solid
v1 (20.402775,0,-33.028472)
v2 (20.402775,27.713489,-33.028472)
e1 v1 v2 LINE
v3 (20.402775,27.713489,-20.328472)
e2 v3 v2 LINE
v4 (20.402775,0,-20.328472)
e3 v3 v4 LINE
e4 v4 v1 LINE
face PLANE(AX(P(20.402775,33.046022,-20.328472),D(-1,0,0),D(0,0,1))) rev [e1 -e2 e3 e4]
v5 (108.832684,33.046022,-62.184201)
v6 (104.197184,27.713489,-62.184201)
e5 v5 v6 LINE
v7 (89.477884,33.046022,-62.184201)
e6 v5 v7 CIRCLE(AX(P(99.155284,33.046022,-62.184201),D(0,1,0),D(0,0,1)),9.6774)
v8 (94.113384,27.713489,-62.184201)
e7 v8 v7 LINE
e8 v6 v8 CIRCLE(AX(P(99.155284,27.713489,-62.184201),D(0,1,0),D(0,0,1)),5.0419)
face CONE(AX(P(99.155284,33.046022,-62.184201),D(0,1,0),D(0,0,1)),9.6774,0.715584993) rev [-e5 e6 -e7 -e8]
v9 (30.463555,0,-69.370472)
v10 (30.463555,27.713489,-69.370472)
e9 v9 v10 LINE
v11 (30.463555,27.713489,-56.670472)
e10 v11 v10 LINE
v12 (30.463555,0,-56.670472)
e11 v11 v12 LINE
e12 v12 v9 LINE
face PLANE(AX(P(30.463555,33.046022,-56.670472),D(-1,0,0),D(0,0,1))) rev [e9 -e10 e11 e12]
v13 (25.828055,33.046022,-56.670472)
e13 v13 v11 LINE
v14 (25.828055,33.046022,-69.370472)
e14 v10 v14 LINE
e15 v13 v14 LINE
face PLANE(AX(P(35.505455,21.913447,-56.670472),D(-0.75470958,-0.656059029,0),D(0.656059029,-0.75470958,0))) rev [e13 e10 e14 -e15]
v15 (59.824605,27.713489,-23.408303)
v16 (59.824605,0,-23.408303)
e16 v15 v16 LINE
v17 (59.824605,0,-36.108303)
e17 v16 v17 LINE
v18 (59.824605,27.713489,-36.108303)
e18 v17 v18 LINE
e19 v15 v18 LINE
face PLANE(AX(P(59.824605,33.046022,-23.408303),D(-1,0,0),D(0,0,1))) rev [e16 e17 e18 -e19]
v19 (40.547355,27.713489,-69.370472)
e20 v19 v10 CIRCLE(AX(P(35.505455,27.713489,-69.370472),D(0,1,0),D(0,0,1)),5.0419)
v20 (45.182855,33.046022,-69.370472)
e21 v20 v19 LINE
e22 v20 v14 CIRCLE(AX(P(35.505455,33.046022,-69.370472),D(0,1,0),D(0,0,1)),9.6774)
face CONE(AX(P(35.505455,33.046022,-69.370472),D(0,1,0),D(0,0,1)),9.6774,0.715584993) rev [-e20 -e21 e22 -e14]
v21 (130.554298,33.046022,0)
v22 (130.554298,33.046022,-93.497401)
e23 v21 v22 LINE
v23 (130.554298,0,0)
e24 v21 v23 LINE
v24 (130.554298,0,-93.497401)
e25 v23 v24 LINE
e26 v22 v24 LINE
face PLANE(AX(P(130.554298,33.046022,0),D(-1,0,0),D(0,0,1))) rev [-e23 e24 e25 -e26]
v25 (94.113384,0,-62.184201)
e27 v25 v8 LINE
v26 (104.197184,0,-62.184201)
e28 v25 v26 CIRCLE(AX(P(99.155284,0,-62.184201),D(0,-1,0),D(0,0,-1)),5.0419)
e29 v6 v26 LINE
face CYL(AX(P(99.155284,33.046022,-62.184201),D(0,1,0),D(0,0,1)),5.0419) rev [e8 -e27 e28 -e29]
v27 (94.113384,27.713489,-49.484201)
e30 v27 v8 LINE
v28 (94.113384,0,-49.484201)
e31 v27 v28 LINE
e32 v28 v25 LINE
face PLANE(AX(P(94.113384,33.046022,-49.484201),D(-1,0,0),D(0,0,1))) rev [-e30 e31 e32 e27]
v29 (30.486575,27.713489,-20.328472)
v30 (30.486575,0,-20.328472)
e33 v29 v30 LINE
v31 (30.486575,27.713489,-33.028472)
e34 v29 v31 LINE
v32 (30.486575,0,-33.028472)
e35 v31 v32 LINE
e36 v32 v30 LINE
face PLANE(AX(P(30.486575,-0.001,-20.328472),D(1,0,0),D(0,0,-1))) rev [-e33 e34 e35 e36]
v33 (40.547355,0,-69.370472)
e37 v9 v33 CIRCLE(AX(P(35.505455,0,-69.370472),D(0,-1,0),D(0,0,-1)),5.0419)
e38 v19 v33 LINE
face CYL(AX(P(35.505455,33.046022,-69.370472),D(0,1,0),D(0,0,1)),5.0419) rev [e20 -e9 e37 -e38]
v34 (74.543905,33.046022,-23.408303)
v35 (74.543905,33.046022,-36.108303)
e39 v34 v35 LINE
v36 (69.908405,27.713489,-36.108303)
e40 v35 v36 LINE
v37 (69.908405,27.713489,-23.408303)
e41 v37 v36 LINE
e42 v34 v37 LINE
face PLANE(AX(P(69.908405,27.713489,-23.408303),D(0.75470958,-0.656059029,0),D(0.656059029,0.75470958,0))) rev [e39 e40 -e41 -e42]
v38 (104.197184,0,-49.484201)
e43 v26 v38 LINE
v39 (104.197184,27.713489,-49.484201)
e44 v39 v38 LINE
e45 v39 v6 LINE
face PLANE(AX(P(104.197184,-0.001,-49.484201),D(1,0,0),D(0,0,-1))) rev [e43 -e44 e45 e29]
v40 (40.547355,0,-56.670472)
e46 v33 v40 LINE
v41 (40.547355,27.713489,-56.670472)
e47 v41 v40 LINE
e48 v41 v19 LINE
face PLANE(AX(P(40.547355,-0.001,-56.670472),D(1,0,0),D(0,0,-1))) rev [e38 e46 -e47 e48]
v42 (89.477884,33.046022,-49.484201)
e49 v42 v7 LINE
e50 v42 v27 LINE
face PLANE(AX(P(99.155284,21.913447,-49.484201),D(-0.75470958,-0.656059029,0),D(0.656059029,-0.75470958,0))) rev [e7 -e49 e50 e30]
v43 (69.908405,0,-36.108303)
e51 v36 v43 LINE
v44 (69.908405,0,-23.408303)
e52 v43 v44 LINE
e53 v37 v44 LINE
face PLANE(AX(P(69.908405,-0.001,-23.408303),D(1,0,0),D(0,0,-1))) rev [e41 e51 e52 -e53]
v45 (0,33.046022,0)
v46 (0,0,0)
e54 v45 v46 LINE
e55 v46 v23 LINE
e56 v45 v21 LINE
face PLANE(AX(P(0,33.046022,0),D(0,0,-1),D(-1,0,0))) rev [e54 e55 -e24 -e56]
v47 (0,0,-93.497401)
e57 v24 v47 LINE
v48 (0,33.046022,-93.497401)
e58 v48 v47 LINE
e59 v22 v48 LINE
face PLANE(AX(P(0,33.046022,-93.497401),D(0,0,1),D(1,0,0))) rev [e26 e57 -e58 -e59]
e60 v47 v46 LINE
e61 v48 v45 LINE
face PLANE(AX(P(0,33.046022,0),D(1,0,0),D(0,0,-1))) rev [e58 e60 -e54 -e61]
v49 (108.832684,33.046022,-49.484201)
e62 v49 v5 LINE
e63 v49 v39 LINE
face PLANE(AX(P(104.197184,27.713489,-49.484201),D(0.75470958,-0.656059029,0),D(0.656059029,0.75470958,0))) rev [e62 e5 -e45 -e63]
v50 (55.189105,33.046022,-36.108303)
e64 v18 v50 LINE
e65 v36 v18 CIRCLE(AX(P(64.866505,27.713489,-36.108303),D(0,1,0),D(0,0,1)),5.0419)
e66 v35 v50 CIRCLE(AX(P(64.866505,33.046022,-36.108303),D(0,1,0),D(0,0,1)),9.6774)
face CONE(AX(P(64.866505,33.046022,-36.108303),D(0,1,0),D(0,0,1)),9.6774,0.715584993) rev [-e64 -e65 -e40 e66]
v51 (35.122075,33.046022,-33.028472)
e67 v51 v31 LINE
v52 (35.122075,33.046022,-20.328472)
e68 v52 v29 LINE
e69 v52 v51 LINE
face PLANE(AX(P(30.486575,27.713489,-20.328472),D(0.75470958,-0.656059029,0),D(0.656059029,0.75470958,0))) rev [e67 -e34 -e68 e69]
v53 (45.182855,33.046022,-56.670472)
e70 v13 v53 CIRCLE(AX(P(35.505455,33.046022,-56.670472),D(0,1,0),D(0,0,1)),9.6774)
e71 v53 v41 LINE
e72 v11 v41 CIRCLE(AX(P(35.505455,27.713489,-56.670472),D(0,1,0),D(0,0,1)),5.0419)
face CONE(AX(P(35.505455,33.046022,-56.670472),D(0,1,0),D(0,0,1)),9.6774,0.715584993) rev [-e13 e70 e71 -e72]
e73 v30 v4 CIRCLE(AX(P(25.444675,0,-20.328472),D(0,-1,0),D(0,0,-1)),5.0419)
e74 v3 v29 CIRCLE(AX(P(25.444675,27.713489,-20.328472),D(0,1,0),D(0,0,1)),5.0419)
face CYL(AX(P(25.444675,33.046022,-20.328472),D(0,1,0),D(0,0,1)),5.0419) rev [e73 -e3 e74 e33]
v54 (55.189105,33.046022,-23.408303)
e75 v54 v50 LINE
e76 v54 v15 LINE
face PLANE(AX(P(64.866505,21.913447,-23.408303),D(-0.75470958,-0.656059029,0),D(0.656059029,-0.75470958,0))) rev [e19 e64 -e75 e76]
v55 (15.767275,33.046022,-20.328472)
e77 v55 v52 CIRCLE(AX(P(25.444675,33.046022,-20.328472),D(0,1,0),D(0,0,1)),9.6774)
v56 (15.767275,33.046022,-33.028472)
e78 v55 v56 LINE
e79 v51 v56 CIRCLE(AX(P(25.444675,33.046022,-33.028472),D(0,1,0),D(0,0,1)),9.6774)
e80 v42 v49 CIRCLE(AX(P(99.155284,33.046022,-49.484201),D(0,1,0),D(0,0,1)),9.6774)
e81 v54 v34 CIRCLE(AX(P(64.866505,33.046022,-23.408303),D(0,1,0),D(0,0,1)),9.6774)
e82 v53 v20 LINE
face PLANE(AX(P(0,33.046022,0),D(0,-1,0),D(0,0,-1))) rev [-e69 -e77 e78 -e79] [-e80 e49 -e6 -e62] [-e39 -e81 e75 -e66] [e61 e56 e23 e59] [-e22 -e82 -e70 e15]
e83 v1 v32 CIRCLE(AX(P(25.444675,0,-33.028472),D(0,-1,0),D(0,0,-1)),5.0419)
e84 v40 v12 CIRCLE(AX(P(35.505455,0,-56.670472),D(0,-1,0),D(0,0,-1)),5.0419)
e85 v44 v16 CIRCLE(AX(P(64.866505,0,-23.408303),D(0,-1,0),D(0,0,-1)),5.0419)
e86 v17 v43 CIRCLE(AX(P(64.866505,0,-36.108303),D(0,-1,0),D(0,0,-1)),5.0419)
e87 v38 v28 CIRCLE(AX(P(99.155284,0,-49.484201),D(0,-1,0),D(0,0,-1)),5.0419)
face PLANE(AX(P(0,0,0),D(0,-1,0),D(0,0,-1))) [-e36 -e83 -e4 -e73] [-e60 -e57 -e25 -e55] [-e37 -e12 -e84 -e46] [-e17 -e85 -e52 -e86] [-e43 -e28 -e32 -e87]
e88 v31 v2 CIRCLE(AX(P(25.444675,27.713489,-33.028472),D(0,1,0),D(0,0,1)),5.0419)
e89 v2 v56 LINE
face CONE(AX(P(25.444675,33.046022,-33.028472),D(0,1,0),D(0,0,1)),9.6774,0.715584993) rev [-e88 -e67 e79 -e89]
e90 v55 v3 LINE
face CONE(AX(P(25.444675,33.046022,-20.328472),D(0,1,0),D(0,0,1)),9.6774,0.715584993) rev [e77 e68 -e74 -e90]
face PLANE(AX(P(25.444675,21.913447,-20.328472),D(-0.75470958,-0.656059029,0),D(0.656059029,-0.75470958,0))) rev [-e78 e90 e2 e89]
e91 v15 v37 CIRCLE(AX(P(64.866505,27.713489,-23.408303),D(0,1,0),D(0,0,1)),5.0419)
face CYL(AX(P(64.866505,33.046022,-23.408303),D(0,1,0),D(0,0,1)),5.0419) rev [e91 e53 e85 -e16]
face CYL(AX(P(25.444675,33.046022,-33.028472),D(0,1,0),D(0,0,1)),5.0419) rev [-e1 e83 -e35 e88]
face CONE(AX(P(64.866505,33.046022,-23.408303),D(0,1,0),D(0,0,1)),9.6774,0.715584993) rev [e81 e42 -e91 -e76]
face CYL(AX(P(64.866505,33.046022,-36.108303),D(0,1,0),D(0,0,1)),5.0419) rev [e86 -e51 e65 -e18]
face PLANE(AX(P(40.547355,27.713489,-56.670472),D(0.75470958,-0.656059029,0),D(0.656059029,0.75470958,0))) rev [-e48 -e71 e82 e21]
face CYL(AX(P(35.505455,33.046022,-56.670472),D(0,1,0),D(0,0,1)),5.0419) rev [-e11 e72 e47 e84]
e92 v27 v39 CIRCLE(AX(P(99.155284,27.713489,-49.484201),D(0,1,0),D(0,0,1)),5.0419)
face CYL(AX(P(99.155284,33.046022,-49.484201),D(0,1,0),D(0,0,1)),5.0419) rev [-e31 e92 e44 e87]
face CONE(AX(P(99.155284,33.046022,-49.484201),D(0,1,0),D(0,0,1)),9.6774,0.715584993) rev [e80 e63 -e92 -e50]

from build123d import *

# Parameters (mm, degrees)
SKETCH1_W                                      = 130.554298298
SKETCH1_H                                      = 93.497401401
BOSS_EXTRUDE1_DEPTH                            = 33.046022073
CSK_SLOT_FOR_3_8_FLAT_HEAD_MACHINE_SCREW_DEPTH = 33.046022073


with BuildPart() as part:
    # Sketch1 → Boss-Extrude1 (new body)
    with BuildSketch(Plane(origin=(0, 0, 0), x_dir=(1, 0, 0), z_dir=(0, 1, 0))):
        with Locations((65.277149149, 46.748700701)):
            Rectangle(SKETCH1_W, SKETCH1_H)
    extrude(amount=BOSS_EXTRUDE1_DEPTH)

    # CSK SLOT for 3/8 Flat Head Machine Screw1: read off the stored shape, not the designer's step
    # CSK SLOT for 3_8 Flat Head Machine S 2 → CSK SLOT for 3/8 Flat Head Machine Screw1 (cut)
    with BuildSketch(Plane(origin=(0, 0, 0), x_dir=(1, 0, 0), z_dir=(0, 1, 0))):
        with BuildLine():
            Line((30.486575013, 20.328472109), (30.486575013, 33.028472109))
            ThreePointArc((30.486575013, 33.028472109), (25.444675013, 38.070372109), (20.402775013, 33.028472109))
            Line((20.402775013, 33.028472109), (20.402775013, 20.328472109))
            ThreePointArc((20.402775013, 20.328472109), (25.444675013, 15.286572109), (30.486575013, 20.328472109))
        make_face()
        with BuildLine():
            Line((69.908405086, 23.408302584), (69.908405086, 36.108302584))
            ThreePointArc((69.908405086, 36.108302584), (64.866505086, 41.150202584), (59.824605086, 36.108302584))
            Line((59.824605086, 36.108302584), (59.824605086, 23.408302584))
            ThreePointArc((59.824605086, 23.408302584), (64.866505086, 18.366402584), (69.908405086, 23.408302584))
        make_face()
        with BuildLine():
            Line((104.197184368, 49.4842006), (104.197184368, 62.1842006))
            ThreePointArc((104.197184368, 62.1842006), (99.155284368, 67.2261006), (94.113384368, 62.1842006))
            Line((94.113384368, 62.1842006), (94.113384368, 49.4842006))
            ThreePointArc((94.113384368, 49.4842006), (99.155284368, 44.4423006), (104.197184368, 49.4842006))
        make_face()
        with BuildLine():
            Line((40.547354563, 56.670471707), (40.547354563, 69.370471707))
            ThreePointArc((40.547354563, 69.370471707), (35.505454563, 74.412371707), (30.463554563, 69.370471707))
            Line((30.463554563, 69.370471707), (30.463554563, 56.670471707))
            ThreePointArc((30.463554563, 56.670471707), (35.505454563, 51.628571707), (40.547354563, 56.670471707))
        make_face()
    extrude(amount=CSK_SLOT_FOR_3_8_FLAT_HEAD_MACHINE_SCREW_DEPTH, mode=Mode.SUBTRACT)

    # CSK SLOT for 3_8 Flat Head Machine S 3: loft between two sections, ruled curve by curve
    csk_slot_for_3_8_flat_head_machine_s_3_from = [
        Edge.make_three_point_arc((30.486575013, 27.713489321, -33.028472109), (29.009836693, 27.713489321, -36.593633789), (25.444675013, 27.713489321, -38.070372109)),
        Edge.make_three_point_arc((25.444675013, 27.713489321, -38.070372109), (21.879513333, 27.713489321, -36.593633789), (20.402775013, 27.713489321, -33.028472109)),
        Edge.make_three_point_arc((20.402775013, 27.713489321, -20.328472109), (21.879513333, 27.713489321, -16.763310429), (25.444675013, 27.713489321, -15.286572109)),
        Edge.make_three_point_arc((25.444675013, 27.713489321, -15.286572109), (29.009836693, 27.713489321, -16.763310429), (30.486575013, 27.713489321, -20.328472109)),
        Edge.make_line((20.402775013, 27.713489321, -33.028472109), (20.402775013, 27.713489321, -20.328472109)),
        Edge.make_line((30.486575013, 27.713489321, -33.028472109), (30.486575013, 27.713489321, -20.328472109)),
    ]
    csk_slot_for_3_8_flat_head_machine_s_3_to = [
        Edge.make_three_point_arc((35.122075013, 33.046022073, -33.028472109), (32.287630178, 33.046022073, -39.871427273), (25.444675013, 33.046022073, -42.705872109)),
        Edge.make_three_point_arc((25.444675013, 33.046022073, -42.705872109), (18.601719849, 33.046022073, -39.871427273), (15.767275013, 33.046022073, -33.028472109)),
        Edge.make_three_point_arc((15.767275013, 33.046022073, -20.328472109), (18.601719849, 33.046022073, -13.485516945), (25.444675013, 33.046022073, -10.651072109)),
        Edge.make_three_point_arc((25.444675013, 33.046022073, -10.651072109), (32.287630178, 33.046022073, -13.485516945), (35.122075013, 33.046022073, -20.328472109)),
        Edge.make_line((15.767275013, 33.046022073, -33.028472109), (15.767275013, 33.046022073, -20.328472109)),
        Edge.make_line((35.122075013, 33.046022073, -33.028472109), (35.122075013, 33.046022073, -20.328472109)),
    ]
    csk_slot_for_3_8_flat_head_machine_s_3 = Solid(Shell([*[Face.make_surface_from_curves(csk_slot_for_3_8_flat_head_machine_s_3_from[k], csk_slot_for_3_8_flat_head_machine_s_3_to[k]) for k in range(6)], Face(Wire(csk_slot_for_3_8_flat_head_machine_s_3_from)), Face(Wire(csk_slot_for_3_8_flat_head_machine_s_3_to))]))
    add(csk_slot_for_3_8_flat_head_machine_s_3, mode=Mode.SUBTRACT)

    # CSK SLOT for 3_8 Flat Head Machine S 4: loft between two sections, ruled curve by curve
    csk_slot_for_3_8_flat_head_machine_s_4_from = [
        Edge.make_three_point_arc((69.908405086, 27.713489321, -36.108302584), (68.431666766, 27.713489321, -39.673464264), (64.866505086, 27.713489321, -41.150202584)),
        Edge.make_three_point_arc((64.866505086, 27.713489321, -41.150202584), (61.301343406, 27.713489321, -39.673464264), (59.824605086, 27.713489321, -36.108302584)),
        Edge.make_three_point_arc((59.824605086, 27.713489321, -23.408302584), (61.301343406, 27.713489321, -19.843140903), (64.866505086, 27.713489321, -18.366402584)),
        Edge.make_three_point_arc((64.866505086, 27.713489321, -18.366402584), (68.431666766, 27.713489321, -19.843140903), (69.908405086, 27.713489321, -23.408302584)),
        Edge.make_line((59.824605086, 27.713489321, -36.108302584), (59.824605086, 27.713489321, -23.408302584)),
        Edge.make_line((69.908405086, 27.713489321, -36.108302584), (69.908405086, 27.713489321, -23.408302584)),
    ]
    csk_slot_for_3_8_flat_head_machine_s_4_to = [
        Edge.make_three_point_arc((74.543905086, 33.046022073, -36.108302584), (71.70946025, 33.046022073, -42.951257748), (64.866505086, 33.046022073, -45.785702584)),
        Edge.make_three_point_arc((64.866505086, 33.046022073, -45.785702584), (58.023549922, 33.046022073, -42.951257748), (55.189105086, 33.046022073, -36.108302584)),
        Edge.make_three_point_arc((55.189105086, 33.046022073, -23.408302584), (58.023549922, 33.046022073, -16.565347419), (64.866505086, 33.046022073, -13.730902584)),
        Edge.make_three_point_arc((64.866505086, 33.046022073, -13.730902584), (71.70946025, 33.046022073, -16.565347419), (74.543905086, 33.046022073, -23.408302584)),
        Edge.make_line((55.189105086, 33.046022073, -36.108302584), (55.189105086, 33.046022073, -23.408302584)),
        Edge.make_line((74.543905086, 33.046022073, -36.108302584), (74.543905086, 33.046022073, -23.408302584)),
    ]
    csk_slot_for_3_8_flat_head_machine_s_4 = Solid(Shell([*[Face.make_surface_from_curves(csk_slot_for_3_8_flat_head_machine_s_4_from[k], csk_slot_for_3_8_flat_head_machine_s_4_to[k]) for k in range(6)], Face(Wire(csk_slot_for_3_8_flat_head_machine_s_4_from)), Face(Wire(csk_slot_for_3_8_flat_head_machine_s_4_to))]))
    add(csk_slot_for_3_8_flat_head_machine_s_4, mode=Mode.SUBTRACT)

    # CSK SLOT for 3_8 Flat Head Machine S 5: loft between two sections, ruled curve by curve
    csk_slot_for_3_8_flat_head_machine_s_5_from = [
        Edge.make_three_point_arc((104.197184368, 27.713489321, -62.1842006), (102.720446048, 27.713489321, -65.74936228), (99.155284368, 27.713489321, -67.2261006)),
        Edge.make_three_point_arc((99.155284368, 27.713489321, -67.2261006), (95.590122688, 27.713489321, -65.74936228), (94.113384368, 27.713489321, -62.1842006)),
        Edge.make_three_point_arc((94.113384368, 27.713489321, -49.4842006), (95.590122688, 27.713489321, -45.91903892), (99.155284368, 27.713489321, -44.4423006)),
        Edge.make_three_point_arc((99.155284368, 27.713489321, -44.4423006), (102.720446048, 27.713489321, -45.91903892), (104.197184368, 27.713489321, -49.4842006)),
        Edge.make_line((94.113384368, 27.713489321, -62.1842006), (94.113384368, 27.713489321, -49.4842006)),
        Edge.make_line((104.197184368, 27.713489321, -62.1842006), (104.197184368, 27.713489321, -49.4842006)),
    ]
    csk_slot_for_3_8_flat_head_machine_s_5_to = [
        Edge.make_three_point_arc((108.832684368, 33.046022073, -62.1842006), (105.998239532, 33.046022073, -69.027155764), (99.155284368, 33.046022073, -71.8616006)),
        Edge.make_three_point_arc((99.155284368, 33.046022073, -71.8616006), (92.312329203, 33.046022073, -69.027155764), (89.477884368, 33.046022073, -62.1842006)),
        Edge.make_three_point_arc((89.477884368, 33.046022073, -49.4842006), (92.312329203, 33.046022073, -42.641245436), (99.155284368, 33.046022073, -39.8068006)),
        Edge.make_three_point_arc((99.155284368, 33.046022073, -39.8068006), (105.998239532, 33.046022073, -42.641245436), (108.832684368, 33.046022073, -49.4842006)),
        Edge.make_line((89.477884368, 33.046022073, -62.1842006), (89.477884368, 33.046022073, -49.4842006)),
        Edge.make_line((108.832684368, 33.046022073, -62.1842006), (108.832684368, 33.046022073, -49.4842006)),
    ]
    csk_slot_for_3_8_flat_head_machine_s_5 = Solid(Shell([*[Face.make_surface_from_curves(csk_slot_for_3_8_flat_head_machine_s_5_from[k], csk_slot_for_3_8_flat_head_machine_s_5_to[k]) for k in range(6)], Face(Wire(csk_slot_for_3_8_flat_head_machine_s_5_from)), Face(Wire(csk_slot_for_3_8_flat_head_machine_s_5_to))]))
    add(csk_slot_for_3_8_flat_head_machine_s_5, mode=Mode.SUBTRACT)

    # CSK SLOT for 3_8 Flat Head Machine S 6: loft between two sections, ruled curve by curve
    csk_slot_for_3_8_flat_head_machine_s_6_from = [
        Edge.make_three_point_arc((40.547354563, 27.713489321, -69.370471707), (39.070616243, 27.713489321, -72.935633387), (35.505454563, 27.713489321, -74.412371707)),
        Edge.make_three_point_arc((35.505454563, 27.713489321, -74.412371707), (31.940292883, 27.713489321, -72.935633387), (30.463554563, 27.713489321, -69.370471707)),
        Edge.make_three_point_arc((30.463554563, 27.713489321, -56.670471707), (31.940292883, 27.713489321, -53.105310027), (35.505454563, 27.713489321, -51.628571707)),
        Edge.make_three_point_arc((35.505454563, 27.713489321, -51.628571707), (39.070616243, 27.713489321, -53.105310027), (40.547354563, 27.713489321, -56.670471707)),
        Edge.make_line((30.463554563, 27.713489321, -69.370471707), (30.463554563, 27.713489321, -56.670471707)),
        Edge.make_line((40.547354563, 27.713489321, -69.370471707), (40.547354563, 27.713489321, -56.670471707)),
    ]
    csk_slot_for_3_8_flat_head_machine_s_6_to = [
        Edge.make_three_point_arc((45.182854563, 33.046022073, -69.370471707), (42.348409727, 33.046022073, -76.213426871), (35.505454563, 33.046022073, -79.047871707)),
        Edge.make_three_point_arc((35.505454563, 33.046022073, -79.047871707), (28.662499399, 33.046022073, -76.213426871), (25.828054563, 33.046022073, -69.370471707)),
        Edge.make_three_point_arc((25.828054563, 33.046022073, -56.670471707), (28.662499399, 33.046022073, -49.827516543), (35.505454563, 33.046022073, -46.993071707)),
        Edge.make_three_point_arc((35.505454563, 33.046022073, -46.993071707), (42.348409727, 33.046022073, -49.827516543), (45.182854563, 33.046022073, -56.670471707)),
        Edge.make_line((25.828054563, 33.046022073, -69.370471707), (25.828054563, 33.046022073, -56.670471707)),
        Edge.make_line((45.182854563, 33.046022073, -69.370471707), (45.182854563, 33.046022073, -56.670471707)),
    ]
    csk_slot_for_3_8_flat_head_machine_s_6 = Solid(Shell([*[Face.make_surface_from_curves(csk_slot_for_3_8_flat_head_machine_s_6_from[k], csk_slot_for_3_8_flat_head_machine_s_6_to[k]) for k in range(6)], Face(Wire(csk_slot_for_3_8_flat_head_machine_s_6_from)), Face(Wire(csk_slot_for_3_8_flat_head_machine_s_6_to))]))
    add(csk_slot_for_3_8_flat_head_machine_s_6, mode=Mode.SUBTRACT)


solid = part.part
